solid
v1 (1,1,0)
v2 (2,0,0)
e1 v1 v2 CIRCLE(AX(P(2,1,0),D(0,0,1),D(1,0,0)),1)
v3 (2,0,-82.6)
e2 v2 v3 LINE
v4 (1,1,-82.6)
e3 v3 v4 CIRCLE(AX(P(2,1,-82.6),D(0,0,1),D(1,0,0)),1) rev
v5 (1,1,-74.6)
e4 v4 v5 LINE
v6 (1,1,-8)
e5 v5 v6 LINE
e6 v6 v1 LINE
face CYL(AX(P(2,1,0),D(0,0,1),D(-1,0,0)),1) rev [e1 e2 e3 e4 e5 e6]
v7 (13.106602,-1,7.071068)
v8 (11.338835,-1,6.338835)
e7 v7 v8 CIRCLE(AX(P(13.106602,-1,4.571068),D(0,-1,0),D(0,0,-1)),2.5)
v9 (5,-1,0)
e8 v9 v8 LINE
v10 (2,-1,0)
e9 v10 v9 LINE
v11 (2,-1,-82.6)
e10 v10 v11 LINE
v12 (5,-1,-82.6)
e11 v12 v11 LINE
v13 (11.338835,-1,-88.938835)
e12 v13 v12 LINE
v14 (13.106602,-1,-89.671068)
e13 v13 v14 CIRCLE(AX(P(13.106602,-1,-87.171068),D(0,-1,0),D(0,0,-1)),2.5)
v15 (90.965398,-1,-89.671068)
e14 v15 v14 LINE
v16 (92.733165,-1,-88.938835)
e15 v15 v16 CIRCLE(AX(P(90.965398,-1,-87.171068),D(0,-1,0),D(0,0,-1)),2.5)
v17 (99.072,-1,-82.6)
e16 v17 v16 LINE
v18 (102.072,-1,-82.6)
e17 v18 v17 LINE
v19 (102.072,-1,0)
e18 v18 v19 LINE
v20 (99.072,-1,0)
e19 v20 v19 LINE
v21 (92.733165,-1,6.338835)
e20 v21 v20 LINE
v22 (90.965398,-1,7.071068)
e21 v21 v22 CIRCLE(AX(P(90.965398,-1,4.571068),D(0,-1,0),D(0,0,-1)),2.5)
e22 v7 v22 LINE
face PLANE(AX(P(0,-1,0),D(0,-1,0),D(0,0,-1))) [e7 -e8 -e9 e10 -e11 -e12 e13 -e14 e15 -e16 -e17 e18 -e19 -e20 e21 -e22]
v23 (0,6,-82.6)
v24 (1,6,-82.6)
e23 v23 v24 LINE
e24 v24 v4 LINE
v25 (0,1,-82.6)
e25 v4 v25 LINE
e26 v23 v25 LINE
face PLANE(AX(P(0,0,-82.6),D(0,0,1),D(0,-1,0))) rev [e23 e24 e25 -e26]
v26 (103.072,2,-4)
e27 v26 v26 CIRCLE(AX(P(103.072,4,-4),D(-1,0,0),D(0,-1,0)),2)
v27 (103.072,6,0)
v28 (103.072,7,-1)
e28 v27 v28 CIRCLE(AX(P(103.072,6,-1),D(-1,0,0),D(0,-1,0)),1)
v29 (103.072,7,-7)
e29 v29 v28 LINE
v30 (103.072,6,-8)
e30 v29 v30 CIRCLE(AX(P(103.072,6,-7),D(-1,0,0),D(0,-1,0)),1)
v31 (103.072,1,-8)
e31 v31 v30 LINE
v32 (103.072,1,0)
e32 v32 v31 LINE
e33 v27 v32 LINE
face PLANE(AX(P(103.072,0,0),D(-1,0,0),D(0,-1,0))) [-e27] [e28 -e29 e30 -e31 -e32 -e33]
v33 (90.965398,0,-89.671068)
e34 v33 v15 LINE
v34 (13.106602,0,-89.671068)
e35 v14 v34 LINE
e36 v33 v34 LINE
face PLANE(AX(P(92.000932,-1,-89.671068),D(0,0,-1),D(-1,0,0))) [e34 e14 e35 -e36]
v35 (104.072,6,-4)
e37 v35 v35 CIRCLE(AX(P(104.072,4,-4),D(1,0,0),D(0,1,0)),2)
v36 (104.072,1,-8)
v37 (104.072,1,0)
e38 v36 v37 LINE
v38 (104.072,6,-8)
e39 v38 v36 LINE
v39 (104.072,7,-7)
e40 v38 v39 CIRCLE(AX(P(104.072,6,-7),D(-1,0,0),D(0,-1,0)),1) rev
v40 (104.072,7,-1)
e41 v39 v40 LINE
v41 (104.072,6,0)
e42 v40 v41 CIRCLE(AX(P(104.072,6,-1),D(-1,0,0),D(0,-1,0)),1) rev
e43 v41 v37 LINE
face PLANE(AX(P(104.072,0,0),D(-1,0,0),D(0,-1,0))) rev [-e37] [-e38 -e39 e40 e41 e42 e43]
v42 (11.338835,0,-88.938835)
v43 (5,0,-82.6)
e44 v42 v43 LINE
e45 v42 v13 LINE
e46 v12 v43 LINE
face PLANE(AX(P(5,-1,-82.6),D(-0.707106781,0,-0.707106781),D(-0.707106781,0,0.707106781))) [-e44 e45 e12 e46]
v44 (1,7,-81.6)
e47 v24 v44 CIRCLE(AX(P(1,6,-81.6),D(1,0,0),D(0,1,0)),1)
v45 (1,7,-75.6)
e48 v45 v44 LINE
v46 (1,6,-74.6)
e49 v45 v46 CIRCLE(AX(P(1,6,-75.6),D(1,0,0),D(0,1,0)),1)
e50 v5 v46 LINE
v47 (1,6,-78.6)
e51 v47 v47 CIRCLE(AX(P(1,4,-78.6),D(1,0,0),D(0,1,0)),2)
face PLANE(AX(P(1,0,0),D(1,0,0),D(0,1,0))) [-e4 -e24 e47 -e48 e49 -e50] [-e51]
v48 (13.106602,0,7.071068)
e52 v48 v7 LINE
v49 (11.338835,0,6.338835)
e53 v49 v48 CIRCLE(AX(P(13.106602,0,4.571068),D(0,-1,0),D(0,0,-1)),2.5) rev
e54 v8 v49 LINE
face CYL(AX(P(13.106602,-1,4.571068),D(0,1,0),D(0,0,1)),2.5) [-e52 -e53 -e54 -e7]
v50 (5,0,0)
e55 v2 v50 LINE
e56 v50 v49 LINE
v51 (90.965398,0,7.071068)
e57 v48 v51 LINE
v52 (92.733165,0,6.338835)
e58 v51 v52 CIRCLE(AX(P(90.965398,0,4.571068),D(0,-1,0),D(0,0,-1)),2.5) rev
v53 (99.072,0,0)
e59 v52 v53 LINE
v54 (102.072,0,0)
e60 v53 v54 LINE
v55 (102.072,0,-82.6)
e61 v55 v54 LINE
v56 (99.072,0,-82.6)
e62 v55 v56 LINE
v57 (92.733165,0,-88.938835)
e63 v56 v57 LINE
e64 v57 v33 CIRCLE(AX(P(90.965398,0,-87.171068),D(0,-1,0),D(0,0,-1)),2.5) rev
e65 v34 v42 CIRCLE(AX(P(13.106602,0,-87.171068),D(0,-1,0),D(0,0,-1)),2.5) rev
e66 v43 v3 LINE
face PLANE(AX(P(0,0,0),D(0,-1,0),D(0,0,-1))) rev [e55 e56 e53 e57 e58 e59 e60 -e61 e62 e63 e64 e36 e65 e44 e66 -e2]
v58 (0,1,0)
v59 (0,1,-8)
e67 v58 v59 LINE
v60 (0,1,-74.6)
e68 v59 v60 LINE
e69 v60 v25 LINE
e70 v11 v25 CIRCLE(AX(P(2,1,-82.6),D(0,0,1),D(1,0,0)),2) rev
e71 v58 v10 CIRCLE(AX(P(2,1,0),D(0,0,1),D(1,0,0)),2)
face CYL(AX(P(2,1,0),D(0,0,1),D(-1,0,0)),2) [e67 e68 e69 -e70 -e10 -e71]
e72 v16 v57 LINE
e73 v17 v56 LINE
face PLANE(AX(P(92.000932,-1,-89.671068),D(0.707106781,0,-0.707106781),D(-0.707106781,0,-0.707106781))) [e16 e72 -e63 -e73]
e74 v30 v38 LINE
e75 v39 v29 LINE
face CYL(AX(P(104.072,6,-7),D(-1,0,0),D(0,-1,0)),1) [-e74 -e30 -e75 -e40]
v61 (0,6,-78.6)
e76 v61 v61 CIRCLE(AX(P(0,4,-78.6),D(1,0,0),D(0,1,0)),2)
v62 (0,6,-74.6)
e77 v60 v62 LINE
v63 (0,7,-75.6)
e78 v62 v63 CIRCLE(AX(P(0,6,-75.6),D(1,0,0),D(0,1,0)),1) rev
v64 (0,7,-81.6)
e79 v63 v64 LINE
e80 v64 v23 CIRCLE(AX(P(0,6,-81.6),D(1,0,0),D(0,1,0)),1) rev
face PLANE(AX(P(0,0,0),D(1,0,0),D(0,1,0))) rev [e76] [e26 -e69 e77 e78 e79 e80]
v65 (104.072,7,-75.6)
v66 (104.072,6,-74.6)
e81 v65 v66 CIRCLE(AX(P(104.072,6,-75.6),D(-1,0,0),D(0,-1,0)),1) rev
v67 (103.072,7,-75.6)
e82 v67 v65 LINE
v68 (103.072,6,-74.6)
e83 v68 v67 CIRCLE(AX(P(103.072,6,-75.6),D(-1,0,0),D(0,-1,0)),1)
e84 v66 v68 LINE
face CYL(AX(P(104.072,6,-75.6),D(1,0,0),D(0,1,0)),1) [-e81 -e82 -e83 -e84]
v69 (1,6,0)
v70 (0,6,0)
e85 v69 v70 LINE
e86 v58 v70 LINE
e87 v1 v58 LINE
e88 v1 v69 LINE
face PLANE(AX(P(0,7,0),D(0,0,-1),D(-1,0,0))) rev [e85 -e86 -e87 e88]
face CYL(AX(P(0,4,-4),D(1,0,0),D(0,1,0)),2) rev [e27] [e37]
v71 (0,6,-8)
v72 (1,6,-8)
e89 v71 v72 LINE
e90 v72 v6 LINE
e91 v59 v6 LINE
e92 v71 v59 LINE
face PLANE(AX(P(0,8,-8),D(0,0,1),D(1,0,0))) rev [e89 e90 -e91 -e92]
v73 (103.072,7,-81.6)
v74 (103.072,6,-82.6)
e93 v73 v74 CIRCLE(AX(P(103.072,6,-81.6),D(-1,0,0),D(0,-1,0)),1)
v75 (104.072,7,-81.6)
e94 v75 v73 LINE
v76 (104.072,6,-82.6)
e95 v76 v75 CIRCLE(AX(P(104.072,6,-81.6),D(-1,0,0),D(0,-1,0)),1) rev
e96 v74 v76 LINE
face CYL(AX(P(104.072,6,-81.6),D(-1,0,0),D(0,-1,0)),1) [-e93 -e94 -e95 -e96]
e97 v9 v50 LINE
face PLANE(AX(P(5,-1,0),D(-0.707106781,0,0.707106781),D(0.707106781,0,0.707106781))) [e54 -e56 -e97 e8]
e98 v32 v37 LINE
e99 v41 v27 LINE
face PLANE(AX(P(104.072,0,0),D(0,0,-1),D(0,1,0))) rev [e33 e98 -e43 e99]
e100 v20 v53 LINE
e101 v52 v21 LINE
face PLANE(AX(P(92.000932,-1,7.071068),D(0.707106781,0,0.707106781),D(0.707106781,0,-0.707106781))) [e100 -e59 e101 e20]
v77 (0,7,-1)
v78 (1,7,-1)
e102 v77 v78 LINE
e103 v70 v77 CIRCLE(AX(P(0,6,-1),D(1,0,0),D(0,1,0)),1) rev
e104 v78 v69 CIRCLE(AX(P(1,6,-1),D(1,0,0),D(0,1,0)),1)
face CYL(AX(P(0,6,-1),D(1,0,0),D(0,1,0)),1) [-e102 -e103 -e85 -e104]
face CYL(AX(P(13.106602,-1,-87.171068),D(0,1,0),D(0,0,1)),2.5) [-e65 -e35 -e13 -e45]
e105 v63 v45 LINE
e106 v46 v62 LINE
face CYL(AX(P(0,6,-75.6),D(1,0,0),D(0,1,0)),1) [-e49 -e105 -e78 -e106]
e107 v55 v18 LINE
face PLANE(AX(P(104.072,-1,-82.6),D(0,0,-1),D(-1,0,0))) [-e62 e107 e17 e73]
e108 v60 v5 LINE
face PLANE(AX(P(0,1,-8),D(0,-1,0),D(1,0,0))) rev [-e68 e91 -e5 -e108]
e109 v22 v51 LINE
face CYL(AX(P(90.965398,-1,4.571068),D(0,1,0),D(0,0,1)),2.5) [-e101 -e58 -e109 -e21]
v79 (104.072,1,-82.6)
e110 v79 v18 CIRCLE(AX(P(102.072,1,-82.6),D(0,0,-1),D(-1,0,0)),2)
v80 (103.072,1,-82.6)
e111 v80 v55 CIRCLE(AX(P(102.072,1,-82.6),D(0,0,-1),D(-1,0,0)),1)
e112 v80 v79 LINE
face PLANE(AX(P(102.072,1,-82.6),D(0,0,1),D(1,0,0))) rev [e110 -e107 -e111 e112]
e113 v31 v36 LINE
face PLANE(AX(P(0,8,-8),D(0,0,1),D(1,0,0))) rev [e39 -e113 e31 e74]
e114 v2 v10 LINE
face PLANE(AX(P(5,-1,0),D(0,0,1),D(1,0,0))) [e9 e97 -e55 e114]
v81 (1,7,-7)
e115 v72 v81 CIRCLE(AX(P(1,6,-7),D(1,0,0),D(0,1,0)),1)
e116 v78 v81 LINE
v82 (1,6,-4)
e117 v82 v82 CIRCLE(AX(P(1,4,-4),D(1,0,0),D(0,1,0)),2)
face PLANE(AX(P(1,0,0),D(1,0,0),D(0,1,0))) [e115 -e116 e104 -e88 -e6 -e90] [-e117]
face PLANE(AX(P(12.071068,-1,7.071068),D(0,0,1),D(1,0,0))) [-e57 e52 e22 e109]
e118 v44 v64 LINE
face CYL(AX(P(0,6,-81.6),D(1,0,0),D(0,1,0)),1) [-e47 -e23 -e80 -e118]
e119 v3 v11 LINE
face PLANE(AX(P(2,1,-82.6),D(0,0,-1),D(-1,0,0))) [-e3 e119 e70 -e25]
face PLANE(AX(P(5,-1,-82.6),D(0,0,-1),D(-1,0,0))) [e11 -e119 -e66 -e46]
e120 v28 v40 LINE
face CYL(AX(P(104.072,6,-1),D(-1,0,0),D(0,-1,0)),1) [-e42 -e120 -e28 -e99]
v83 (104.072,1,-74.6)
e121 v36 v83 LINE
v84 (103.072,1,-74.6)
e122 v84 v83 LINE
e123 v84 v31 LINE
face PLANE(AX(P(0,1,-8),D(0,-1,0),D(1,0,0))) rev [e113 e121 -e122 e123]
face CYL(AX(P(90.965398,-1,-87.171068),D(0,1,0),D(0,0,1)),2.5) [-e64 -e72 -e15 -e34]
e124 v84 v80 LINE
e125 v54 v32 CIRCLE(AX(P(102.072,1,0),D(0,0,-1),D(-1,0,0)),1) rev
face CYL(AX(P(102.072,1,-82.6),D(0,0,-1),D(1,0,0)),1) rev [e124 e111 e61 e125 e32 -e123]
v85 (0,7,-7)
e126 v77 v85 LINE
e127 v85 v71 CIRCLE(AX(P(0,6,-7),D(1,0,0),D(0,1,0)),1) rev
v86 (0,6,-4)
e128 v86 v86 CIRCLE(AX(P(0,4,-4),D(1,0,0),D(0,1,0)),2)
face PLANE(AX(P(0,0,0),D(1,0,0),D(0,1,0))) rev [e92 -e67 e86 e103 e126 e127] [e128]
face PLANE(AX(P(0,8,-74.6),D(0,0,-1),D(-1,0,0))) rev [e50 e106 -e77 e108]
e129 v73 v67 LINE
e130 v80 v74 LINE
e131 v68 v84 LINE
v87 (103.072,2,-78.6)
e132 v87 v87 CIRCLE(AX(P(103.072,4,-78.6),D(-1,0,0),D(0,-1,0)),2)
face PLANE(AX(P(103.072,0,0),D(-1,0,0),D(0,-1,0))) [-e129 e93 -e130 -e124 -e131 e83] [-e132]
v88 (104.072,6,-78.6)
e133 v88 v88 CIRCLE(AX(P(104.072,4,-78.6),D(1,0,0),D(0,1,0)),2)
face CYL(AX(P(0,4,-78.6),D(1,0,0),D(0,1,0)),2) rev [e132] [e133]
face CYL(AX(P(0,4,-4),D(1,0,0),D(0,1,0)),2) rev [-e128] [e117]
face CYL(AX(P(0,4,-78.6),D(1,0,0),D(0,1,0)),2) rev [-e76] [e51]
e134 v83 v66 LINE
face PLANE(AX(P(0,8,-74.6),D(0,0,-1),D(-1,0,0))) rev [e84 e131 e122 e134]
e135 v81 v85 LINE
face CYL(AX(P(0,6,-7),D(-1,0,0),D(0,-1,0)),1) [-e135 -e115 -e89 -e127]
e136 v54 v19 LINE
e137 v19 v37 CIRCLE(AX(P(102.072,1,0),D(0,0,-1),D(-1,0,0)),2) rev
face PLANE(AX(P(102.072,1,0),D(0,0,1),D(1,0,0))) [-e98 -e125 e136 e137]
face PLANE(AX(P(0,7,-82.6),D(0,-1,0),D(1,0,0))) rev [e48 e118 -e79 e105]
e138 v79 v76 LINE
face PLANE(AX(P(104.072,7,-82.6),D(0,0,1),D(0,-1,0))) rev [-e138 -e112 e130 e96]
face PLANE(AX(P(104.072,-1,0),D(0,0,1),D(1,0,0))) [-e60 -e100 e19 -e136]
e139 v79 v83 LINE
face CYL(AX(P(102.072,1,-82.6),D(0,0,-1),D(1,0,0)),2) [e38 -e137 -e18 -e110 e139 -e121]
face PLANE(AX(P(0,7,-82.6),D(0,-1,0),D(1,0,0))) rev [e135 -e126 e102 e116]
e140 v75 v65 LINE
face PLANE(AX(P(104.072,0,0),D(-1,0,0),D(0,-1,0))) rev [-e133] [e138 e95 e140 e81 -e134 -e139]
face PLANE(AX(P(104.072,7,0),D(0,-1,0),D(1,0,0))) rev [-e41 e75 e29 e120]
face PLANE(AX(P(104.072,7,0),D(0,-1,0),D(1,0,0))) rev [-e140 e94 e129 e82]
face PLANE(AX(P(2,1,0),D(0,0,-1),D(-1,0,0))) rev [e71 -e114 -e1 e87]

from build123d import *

# Parameters (mm, degrees)
BASE_FLANGE2_DEPTH             = 1
EDGE_FLANGE1_STRIP_W           = 6
EDGE_FLANGE1_STRIP_H           = 1
EDGE_FLANGE1_STRIP_CUT_DEPTH   = 82.6
EDGE_FLANGE1_STRIP_2_W         = 6
EDGE_FLANGE1_STRIP_2_H         = 1
EDGE_FLANGE1_STRIP_CUT_2_DEPTH = 82.6
EDGE_FLANGE1_DEPTH             = 82.6
EDGE_FLANGE1_BEND_DEPTH        = 82.6
SKETCH16_W                     = 66.6
SKETCH16_H                     = 7
CUT_EXTRUDE1_DEPTH             = 138.553195479
FILLET1_R                      = 1
SKETCH17_R                     = 2
CUT_EXTRUDE2_DEPTH             = 138.553195479
FILLET2_R                      = 2.5


# Sheet-metal steps are written as plain solids
with BuildPart() as part:
    # Sketch1 → Base-Flange2 (new body)
    with BuildSketch(Plane(origin=(0, 0, 0), x_dir=(1, 0, 0), z_dir=(0, 1, 0))):
        Polygon((0, 0), (0, 82.6), (5, 82.6), (12.071067812, 89.671067812), (92.000932188, 89.671067812), (99.072, 82.6), (104.072, 82.6), (104.072, 0), (99.072, 0), (92.000932188, -7.071067812), (12.071067812, -7.071067812), (5, 0), align=None)
    extrude(amount=-BASE_FLANGE2_DEPTH)

    # Edge-Flange1 strip (across the edge) → Edge-Flange1 strip cut (cut)
    with BuildSketch(Plane(origin=(104.072, 0, 0), x_dir=(-1, 0, 0), z_dir=(0, 0, -1))):
        with Locations((-1, -0.5)):
            Rectangle(EDGE_FLANGE1_STRIP_W, EDGE_FLANGE1_STRIP_H)
    extrude(amount=EDGE_FLANGE1_STRIP_CUT_DEPTH, mode=Mode.SUBTRACT)

    # Edge-Flange1 strip 2 (across the edge) → Edge-Flange1 strip cut 2 (cut)
    with BuildSketch(Plane.XY.offset(-82.6)):
        with Locations((-1, -0.5)):
            Rectangle(EDGE_FLANGE1_STRIP_2_W, EDGE_FLANGE1_STRIP_2_H)
    extrude(amount=EDGE_FLANGE1_STRIP_CUT_2_DEPTH, mode=Mode.SUBTRACT)

    # Edge-Flange1 section (across the edge) → Edge-Flange1 (add)
    with BuildSketch(Plane(origin=(104.072, 0, 0), x_dir=(-1, 0, 0), z_dir=(0, 0, -1))):
        with BuildLine():
            Line((0, 1), (0, 7))
            Line((0, 7), (1, 7))
            Line((1, 7), (1, 1))
            ThreePointArc((1, 1), (1.292893219, 0.292893219), (2, 0))
            Line((2, 0), (2, -1))
            ThreePointArc((2, -1), (0.585786438, -0.414213562), (0, 1))
        make_face()
    extrude(amount=EDGE_FLANGE1_DEPTH)

    # Edge-Flange1 section 2 (across the edge) → Edge-Flange1 bend (add)
    with BuildSketch(Plane.XY.offset(-82.6)):
        with BuildLine():
            Line((0, 1), (0, 7))
            Line((0, 7), (1, 7))
            Line((1, 7), (1, 1))
            ThreePointArc((1, 1), (1.292893219, 0.292893219), (2, 0))
            Line((2, 0), (2, -1))
            ThreePointArc((2, -1), (0.585786438, -0.414213562), (0, 1))
        make_face()
    extrude(amount=EDGE_FLANGE1_BEND_DEPTH)

    # Sketch16 → Cut-Extrude1 (cut, through all)
    with BuildSketch(Plane(origin=(104.072, 0, 0), x_dir=(0, 0, -1), z_dir=(1, 0, 0))):
        with Locations((41.3, 4.5)):
            Rectangle(SKETCH16_W, SKETCH16_H)
    extrude(amount=-CUT_EXTRUDE1_DEPTH, mode=Mode.SUBTRACT)

    # Fillet1
    fillet1_edges = [part.edges().sort_by_distance(p)[0] for p in [
        (0.5, 7, -74.6),
        (0.5, 7, -8),
        (103.572, 7, -8),
        (103.572, 7, -74.6),
        (103.572, 7, 0),
        (103.572, 7, -82.6),
        (0.5, 7, -82.6),
        (0.5, 7, 0),
    ]]
    fillet(fillet1_edges, radius=FILLET1_R)

    # Sketch17 → Cut-Extrude2 (cut, through all)
    with BuildSketch(Plane(origin=(104.072, 0, 0), x_dir=(0, 0, -1), z_dir=(1, 0, 0))):
        with Locations(Location((4, 4, 0), (0, 0, 90))):
            Circle(SKETCH17_R)
        with Locations(Location((78.6, 4, 0), (0, 0, 90))):
            Circle(SKETCH17_R)
    extrude(amount=-CUT_EXTRUDE2_DEPTH, mode=Mode.SUBTRACT)

    # Fillet2
    fillet2_edges = [part.edges().sort_by_distance(p)[0] for p in [
        (12.071067812, -0.5, -89.671067812),
        (92.000932188, -0.5, -89.671067812),
        (92.000932188, -0.5, 7.071067812),
        (12.071067812, -0.5, 7.071067812),
    ]]
    fillet(fillet2_edges, radius=FILLET2_R)


solid = part.part
